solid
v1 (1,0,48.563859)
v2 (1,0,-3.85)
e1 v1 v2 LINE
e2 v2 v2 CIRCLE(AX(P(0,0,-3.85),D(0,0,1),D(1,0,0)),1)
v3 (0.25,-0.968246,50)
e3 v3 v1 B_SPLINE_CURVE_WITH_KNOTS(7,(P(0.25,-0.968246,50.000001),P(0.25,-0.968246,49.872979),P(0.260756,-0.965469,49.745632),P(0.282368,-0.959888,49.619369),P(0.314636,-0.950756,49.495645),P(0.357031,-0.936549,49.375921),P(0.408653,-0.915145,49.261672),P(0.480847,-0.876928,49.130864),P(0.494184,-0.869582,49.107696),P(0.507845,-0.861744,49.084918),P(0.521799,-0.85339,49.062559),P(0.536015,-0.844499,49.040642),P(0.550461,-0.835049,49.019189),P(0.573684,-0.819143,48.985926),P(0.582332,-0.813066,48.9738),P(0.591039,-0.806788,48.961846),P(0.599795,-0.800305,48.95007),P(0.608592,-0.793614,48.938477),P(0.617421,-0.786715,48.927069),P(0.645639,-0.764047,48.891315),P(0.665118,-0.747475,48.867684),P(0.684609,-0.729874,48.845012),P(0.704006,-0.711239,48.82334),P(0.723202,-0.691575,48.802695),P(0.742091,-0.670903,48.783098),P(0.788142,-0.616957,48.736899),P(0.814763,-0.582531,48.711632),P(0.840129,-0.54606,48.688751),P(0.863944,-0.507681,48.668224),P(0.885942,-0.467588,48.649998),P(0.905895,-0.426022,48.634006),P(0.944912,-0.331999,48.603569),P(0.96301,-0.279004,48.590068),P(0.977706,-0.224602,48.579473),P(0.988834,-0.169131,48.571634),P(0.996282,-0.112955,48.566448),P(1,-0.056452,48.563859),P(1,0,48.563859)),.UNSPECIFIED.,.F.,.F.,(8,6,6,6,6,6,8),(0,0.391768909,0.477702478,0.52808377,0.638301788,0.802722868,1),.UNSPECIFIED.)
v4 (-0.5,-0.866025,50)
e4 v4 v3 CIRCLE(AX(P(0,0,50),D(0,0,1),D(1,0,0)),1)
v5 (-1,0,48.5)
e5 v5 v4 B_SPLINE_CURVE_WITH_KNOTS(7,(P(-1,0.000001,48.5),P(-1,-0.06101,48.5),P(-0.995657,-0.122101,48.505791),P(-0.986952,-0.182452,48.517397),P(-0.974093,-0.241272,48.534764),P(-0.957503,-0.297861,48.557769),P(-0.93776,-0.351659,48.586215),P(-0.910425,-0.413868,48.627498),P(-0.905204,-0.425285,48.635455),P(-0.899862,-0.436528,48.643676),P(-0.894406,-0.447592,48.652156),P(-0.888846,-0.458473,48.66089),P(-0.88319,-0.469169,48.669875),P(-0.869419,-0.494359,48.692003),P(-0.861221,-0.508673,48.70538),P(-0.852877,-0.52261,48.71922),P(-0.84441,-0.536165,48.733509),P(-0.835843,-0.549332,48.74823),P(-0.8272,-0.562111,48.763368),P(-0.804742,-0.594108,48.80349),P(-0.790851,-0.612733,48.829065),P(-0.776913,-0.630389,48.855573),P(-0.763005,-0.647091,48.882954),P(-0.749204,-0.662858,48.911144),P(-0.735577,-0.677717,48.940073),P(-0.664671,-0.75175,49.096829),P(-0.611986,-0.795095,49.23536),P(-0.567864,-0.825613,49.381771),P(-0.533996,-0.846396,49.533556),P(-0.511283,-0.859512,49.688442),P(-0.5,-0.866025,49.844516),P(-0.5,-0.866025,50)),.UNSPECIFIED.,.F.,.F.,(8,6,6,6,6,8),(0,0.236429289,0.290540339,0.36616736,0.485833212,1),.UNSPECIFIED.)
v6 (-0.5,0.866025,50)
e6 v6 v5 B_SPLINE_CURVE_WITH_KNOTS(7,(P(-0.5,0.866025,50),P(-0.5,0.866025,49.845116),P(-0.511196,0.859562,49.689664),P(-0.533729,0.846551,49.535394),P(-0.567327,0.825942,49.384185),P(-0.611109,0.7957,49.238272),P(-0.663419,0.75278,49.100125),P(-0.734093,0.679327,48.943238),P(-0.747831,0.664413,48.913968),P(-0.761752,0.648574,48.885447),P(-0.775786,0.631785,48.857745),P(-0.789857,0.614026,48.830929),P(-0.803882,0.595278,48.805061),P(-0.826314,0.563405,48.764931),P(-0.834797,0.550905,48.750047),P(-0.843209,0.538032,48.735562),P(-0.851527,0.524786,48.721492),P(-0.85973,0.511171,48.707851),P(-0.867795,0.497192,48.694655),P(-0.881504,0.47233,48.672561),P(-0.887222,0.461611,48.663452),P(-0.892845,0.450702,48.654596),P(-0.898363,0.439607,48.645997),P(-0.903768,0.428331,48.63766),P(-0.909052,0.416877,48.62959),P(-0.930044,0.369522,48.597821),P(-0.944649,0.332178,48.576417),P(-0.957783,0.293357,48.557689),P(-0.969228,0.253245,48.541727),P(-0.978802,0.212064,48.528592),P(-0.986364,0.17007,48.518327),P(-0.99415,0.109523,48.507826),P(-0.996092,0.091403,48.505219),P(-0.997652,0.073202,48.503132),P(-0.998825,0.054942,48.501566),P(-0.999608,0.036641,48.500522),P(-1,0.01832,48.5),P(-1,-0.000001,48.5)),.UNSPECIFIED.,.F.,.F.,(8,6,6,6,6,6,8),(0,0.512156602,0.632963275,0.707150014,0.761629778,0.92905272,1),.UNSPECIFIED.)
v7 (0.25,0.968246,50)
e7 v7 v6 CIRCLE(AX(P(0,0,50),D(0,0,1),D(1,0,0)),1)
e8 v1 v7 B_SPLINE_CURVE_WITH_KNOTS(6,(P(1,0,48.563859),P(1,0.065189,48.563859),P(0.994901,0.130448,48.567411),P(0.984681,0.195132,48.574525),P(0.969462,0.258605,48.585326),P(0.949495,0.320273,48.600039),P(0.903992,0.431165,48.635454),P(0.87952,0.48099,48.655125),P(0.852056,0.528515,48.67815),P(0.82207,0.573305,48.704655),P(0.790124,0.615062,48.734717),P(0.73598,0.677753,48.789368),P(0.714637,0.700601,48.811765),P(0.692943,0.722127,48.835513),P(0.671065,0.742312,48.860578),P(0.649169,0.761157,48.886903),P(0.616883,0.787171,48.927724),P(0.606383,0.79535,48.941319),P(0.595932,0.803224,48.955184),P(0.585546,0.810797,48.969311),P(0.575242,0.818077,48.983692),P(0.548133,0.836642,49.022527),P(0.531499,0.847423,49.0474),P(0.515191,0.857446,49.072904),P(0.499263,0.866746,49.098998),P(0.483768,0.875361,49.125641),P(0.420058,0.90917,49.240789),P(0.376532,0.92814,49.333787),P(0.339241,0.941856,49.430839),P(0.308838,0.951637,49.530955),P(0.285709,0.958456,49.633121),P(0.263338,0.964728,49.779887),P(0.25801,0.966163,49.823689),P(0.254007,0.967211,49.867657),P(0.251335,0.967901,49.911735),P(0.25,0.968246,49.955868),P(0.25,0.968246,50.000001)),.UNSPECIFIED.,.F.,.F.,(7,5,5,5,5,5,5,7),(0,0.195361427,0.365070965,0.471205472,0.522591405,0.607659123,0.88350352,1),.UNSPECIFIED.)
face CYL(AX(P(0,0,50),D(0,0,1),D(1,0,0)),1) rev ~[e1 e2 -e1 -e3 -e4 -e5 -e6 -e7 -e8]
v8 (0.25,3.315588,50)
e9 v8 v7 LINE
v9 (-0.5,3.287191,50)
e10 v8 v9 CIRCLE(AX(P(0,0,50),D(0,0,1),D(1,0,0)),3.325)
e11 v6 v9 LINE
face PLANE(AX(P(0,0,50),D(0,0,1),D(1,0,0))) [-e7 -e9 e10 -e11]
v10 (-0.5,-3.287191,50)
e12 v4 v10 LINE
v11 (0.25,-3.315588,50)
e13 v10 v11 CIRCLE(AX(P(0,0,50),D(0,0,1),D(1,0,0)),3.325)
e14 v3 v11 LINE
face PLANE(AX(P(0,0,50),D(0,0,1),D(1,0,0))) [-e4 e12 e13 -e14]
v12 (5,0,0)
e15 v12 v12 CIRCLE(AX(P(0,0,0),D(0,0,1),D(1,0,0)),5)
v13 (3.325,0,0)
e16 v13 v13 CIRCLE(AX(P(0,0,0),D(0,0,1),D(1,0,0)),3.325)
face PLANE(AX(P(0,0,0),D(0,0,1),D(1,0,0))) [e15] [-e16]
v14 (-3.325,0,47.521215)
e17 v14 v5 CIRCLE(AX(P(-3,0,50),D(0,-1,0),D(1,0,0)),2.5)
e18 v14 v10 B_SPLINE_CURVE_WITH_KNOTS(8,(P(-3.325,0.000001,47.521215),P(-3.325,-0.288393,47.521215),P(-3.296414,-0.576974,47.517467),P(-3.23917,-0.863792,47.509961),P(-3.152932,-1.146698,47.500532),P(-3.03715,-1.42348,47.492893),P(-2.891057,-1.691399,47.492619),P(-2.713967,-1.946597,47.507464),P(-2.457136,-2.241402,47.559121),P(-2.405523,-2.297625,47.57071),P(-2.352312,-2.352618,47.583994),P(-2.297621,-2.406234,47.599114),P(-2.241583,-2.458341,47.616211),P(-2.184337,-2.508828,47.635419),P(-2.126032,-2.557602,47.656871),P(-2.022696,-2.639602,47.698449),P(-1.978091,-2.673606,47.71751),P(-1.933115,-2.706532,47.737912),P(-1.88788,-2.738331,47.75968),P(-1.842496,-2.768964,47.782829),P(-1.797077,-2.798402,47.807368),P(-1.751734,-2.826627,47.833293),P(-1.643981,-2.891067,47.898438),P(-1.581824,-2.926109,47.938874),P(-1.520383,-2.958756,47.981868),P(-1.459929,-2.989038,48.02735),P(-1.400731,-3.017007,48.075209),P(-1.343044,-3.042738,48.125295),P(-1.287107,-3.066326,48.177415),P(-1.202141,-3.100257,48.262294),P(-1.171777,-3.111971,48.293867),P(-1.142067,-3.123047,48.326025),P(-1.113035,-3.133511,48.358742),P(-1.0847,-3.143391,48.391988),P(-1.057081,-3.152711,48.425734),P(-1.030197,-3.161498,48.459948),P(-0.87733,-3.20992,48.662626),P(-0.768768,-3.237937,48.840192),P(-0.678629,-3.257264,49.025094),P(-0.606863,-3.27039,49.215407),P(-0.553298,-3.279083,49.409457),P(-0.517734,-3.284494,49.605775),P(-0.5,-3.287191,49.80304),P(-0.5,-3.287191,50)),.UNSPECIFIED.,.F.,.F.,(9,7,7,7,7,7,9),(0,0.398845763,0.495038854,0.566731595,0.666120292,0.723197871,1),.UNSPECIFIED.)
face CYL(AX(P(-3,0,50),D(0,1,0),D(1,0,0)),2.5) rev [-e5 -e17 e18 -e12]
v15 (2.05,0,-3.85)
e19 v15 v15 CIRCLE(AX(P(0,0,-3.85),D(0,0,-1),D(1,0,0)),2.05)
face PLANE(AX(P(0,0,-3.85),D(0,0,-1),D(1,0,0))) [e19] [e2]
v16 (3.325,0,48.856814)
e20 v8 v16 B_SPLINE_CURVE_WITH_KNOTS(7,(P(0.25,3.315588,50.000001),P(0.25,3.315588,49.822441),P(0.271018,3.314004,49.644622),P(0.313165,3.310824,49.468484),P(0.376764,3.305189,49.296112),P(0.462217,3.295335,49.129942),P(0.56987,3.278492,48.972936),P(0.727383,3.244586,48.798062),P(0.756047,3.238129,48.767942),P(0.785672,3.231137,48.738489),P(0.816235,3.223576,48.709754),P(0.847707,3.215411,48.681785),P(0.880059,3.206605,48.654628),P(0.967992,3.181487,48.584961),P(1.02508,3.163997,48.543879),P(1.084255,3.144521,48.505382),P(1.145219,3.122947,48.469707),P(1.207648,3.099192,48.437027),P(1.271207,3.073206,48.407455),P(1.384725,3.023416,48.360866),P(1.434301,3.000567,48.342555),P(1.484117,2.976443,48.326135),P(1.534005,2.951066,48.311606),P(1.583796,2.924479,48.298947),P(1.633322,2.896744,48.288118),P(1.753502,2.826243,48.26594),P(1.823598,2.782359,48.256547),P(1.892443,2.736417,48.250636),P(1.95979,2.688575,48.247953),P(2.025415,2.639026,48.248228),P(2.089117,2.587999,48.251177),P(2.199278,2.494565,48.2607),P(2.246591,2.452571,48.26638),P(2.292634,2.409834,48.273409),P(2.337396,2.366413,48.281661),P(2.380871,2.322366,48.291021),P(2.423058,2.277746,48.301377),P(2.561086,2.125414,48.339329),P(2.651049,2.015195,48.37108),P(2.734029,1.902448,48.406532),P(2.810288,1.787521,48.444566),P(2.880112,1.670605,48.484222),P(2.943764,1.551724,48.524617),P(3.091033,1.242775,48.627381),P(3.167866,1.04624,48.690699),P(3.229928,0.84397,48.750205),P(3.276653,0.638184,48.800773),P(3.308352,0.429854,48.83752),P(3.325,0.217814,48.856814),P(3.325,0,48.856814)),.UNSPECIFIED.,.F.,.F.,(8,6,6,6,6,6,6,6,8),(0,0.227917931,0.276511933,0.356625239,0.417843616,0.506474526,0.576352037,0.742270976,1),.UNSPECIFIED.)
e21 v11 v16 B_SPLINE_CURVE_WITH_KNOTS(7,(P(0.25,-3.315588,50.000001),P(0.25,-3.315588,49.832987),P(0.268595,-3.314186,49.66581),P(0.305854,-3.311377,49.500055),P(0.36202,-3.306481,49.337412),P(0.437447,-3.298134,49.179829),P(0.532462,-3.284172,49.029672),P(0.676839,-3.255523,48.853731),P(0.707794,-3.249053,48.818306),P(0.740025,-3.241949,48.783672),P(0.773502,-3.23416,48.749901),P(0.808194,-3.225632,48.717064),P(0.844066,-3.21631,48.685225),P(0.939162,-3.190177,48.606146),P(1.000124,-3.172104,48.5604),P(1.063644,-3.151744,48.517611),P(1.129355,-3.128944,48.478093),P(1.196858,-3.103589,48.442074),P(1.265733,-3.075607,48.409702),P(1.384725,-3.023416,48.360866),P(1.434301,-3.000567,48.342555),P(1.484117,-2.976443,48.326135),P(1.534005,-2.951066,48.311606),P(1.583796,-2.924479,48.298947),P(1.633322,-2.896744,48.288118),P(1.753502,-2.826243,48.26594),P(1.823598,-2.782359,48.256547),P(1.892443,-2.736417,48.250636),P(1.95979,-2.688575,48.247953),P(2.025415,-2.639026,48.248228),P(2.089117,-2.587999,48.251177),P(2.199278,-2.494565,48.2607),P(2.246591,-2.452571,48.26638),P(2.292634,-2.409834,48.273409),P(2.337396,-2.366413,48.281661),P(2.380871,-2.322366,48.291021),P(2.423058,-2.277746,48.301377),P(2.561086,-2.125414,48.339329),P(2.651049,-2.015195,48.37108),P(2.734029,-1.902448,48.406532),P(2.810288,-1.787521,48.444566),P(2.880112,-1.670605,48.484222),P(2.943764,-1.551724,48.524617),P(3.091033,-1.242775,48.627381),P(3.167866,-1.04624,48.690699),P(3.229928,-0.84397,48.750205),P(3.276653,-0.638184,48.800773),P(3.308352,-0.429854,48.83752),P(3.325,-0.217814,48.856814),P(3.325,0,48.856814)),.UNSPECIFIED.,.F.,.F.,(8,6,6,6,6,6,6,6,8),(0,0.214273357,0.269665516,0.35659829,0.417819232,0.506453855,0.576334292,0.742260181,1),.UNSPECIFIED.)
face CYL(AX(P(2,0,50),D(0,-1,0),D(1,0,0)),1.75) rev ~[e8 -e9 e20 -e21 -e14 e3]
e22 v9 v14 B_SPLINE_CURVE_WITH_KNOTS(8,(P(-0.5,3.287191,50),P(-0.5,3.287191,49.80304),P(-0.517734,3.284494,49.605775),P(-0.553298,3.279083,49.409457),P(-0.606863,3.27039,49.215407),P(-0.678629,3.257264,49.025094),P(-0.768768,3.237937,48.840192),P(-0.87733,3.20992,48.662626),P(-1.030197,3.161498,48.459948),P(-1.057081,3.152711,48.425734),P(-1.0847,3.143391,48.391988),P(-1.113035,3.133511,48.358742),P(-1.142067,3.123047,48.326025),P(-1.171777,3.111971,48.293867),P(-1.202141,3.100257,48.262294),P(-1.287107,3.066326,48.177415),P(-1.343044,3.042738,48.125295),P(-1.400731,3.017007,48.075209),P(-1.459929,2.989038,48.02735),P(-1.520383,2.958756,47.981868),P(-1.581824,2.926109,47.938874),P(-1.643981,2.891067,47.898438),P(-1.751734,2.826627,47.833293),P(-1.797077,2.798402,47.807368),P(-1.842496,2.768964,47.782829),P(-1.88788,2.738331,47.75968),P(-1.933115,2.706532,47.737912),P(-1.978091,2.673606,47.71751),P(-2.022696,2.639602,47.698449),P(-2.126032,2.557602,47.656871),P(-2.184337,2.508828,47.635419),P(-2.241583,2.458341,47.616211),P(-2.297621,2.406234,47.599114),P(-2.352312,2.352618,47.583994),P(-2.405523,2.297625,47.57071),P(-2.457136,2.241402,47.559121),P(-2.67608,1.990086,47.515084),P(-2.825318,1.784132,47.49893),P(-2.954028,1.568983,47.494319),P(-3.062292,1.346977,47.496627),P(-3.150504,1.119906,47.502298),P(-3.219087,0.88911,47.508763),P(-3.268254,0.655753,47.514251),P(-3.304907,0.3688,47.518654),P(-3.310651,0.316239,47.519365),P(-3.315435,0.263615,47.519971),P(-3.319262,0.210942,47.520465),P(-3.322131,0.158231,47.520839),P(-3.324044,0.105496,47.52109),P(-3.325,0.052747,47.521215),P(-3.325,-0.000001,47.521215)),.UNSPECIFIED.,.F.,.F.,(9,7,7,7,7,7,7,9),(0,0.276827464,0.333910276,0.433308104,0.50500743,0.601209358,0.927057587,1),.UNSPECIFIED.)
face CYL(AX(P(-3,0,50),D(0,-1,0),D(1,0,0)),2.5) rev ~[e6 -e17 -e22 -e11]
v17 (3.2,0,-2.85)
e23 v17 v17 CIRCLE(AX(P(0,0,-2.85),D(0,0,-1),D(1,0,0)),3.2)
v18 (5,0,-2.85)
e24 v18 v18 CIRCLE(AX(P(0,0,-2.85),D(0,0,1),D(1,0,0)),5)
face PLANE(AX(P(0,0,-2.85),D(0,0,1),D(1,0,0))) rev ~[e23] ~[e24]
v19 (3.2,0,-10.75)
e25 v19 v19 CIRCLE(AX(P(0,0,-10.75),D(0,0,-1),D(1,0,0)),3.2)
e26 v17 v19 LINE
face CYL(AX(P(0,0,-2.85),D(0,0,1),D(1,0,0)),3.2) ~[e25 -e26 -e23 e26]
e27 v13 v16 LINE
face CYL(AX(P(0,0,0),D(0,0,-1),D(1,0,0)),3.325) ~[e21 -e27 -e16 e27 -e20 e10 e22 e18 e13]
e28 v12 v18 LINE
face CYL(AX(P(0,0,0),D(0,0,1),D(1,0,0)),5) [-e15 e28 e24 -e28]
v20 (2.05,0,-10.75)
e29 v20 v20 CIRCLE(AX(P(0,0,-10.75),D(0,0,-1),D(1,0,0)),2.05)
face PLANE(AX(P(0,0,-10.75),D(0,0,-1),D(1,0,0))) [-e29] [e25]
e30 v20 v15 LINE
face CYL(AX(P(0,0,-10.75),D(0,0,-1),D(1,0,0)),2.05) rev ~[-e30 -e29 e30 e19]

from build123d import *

# Parameters (mm, degrees)
F0_R      = 3.325
F1_DEPTH  = 50
F2_R      = 5
F2_R_2    = 3.325
F3_DEPTH  = 2.85
F4_R      = 3.2
F5_DEPTH  = 7.9
F6_R      = 1
F7_DEPTH  = 55
F8_R      = 2.05
F9_DEPTH  = 6.9
F10_R     = 2.5
F10_R_2   = 1.75
F11_DEPTH = 4


with BuildPart() as f1:
    # F0 (on Top) → F1 (new body)
    with BuildSketch(Plane.XY):
        Circle(F0_R)
    extrude(amount=F1_DEPTH)

    # F2 (on face) → F3 (join)
    with BuildSketch(Plane.XY):
        Circle(F2_R)
        Circle(F2_R_2, mode=Mode.SUBTRACT)
        Circle(F2_R)
    extrude(amount=-F3_DEPTH)

    # F4 (on face) → F5 (join)
    with BuildSketch(Plane(origin=(0, 0, -2.85), x_dir=(1, 0, 0), z_dir=(0, 0, -1))):
        Circle(F4_R)
    extrude(amount=F5_DEPTH)

    # F6 (on face) → F7 (cut)
    with BuildSketch(Plane.XY.offset(50)):
        Circle(F6_R)
    extrude(amount=-F7_DEPTH, mode=Mode.SUBTRACT)

    # F8 (on face) → F9 (cut)
    with BuildSketch(Plane(origin=(0, 0, -10.75), x_dir=(1, 0, 0), z_dir=(0, 0, -1))):
        Circle(F8_R)
    extrude(amount=-F9_DEPTH, mode=Mode.SUBTRACT)

    # F10 (on Front) → F11 (cut, symmetric)
    with BuildSketch(Plane.XZ):
        with Locations((-3, 50)):
            Circle(F10_R)
        with Locations((2, 50)):
            Circle(F10_R_2)
    extrude(amount=F11_DEPTH, both=True, mode=Mode.SUBTRACT)


solid = f1.part
